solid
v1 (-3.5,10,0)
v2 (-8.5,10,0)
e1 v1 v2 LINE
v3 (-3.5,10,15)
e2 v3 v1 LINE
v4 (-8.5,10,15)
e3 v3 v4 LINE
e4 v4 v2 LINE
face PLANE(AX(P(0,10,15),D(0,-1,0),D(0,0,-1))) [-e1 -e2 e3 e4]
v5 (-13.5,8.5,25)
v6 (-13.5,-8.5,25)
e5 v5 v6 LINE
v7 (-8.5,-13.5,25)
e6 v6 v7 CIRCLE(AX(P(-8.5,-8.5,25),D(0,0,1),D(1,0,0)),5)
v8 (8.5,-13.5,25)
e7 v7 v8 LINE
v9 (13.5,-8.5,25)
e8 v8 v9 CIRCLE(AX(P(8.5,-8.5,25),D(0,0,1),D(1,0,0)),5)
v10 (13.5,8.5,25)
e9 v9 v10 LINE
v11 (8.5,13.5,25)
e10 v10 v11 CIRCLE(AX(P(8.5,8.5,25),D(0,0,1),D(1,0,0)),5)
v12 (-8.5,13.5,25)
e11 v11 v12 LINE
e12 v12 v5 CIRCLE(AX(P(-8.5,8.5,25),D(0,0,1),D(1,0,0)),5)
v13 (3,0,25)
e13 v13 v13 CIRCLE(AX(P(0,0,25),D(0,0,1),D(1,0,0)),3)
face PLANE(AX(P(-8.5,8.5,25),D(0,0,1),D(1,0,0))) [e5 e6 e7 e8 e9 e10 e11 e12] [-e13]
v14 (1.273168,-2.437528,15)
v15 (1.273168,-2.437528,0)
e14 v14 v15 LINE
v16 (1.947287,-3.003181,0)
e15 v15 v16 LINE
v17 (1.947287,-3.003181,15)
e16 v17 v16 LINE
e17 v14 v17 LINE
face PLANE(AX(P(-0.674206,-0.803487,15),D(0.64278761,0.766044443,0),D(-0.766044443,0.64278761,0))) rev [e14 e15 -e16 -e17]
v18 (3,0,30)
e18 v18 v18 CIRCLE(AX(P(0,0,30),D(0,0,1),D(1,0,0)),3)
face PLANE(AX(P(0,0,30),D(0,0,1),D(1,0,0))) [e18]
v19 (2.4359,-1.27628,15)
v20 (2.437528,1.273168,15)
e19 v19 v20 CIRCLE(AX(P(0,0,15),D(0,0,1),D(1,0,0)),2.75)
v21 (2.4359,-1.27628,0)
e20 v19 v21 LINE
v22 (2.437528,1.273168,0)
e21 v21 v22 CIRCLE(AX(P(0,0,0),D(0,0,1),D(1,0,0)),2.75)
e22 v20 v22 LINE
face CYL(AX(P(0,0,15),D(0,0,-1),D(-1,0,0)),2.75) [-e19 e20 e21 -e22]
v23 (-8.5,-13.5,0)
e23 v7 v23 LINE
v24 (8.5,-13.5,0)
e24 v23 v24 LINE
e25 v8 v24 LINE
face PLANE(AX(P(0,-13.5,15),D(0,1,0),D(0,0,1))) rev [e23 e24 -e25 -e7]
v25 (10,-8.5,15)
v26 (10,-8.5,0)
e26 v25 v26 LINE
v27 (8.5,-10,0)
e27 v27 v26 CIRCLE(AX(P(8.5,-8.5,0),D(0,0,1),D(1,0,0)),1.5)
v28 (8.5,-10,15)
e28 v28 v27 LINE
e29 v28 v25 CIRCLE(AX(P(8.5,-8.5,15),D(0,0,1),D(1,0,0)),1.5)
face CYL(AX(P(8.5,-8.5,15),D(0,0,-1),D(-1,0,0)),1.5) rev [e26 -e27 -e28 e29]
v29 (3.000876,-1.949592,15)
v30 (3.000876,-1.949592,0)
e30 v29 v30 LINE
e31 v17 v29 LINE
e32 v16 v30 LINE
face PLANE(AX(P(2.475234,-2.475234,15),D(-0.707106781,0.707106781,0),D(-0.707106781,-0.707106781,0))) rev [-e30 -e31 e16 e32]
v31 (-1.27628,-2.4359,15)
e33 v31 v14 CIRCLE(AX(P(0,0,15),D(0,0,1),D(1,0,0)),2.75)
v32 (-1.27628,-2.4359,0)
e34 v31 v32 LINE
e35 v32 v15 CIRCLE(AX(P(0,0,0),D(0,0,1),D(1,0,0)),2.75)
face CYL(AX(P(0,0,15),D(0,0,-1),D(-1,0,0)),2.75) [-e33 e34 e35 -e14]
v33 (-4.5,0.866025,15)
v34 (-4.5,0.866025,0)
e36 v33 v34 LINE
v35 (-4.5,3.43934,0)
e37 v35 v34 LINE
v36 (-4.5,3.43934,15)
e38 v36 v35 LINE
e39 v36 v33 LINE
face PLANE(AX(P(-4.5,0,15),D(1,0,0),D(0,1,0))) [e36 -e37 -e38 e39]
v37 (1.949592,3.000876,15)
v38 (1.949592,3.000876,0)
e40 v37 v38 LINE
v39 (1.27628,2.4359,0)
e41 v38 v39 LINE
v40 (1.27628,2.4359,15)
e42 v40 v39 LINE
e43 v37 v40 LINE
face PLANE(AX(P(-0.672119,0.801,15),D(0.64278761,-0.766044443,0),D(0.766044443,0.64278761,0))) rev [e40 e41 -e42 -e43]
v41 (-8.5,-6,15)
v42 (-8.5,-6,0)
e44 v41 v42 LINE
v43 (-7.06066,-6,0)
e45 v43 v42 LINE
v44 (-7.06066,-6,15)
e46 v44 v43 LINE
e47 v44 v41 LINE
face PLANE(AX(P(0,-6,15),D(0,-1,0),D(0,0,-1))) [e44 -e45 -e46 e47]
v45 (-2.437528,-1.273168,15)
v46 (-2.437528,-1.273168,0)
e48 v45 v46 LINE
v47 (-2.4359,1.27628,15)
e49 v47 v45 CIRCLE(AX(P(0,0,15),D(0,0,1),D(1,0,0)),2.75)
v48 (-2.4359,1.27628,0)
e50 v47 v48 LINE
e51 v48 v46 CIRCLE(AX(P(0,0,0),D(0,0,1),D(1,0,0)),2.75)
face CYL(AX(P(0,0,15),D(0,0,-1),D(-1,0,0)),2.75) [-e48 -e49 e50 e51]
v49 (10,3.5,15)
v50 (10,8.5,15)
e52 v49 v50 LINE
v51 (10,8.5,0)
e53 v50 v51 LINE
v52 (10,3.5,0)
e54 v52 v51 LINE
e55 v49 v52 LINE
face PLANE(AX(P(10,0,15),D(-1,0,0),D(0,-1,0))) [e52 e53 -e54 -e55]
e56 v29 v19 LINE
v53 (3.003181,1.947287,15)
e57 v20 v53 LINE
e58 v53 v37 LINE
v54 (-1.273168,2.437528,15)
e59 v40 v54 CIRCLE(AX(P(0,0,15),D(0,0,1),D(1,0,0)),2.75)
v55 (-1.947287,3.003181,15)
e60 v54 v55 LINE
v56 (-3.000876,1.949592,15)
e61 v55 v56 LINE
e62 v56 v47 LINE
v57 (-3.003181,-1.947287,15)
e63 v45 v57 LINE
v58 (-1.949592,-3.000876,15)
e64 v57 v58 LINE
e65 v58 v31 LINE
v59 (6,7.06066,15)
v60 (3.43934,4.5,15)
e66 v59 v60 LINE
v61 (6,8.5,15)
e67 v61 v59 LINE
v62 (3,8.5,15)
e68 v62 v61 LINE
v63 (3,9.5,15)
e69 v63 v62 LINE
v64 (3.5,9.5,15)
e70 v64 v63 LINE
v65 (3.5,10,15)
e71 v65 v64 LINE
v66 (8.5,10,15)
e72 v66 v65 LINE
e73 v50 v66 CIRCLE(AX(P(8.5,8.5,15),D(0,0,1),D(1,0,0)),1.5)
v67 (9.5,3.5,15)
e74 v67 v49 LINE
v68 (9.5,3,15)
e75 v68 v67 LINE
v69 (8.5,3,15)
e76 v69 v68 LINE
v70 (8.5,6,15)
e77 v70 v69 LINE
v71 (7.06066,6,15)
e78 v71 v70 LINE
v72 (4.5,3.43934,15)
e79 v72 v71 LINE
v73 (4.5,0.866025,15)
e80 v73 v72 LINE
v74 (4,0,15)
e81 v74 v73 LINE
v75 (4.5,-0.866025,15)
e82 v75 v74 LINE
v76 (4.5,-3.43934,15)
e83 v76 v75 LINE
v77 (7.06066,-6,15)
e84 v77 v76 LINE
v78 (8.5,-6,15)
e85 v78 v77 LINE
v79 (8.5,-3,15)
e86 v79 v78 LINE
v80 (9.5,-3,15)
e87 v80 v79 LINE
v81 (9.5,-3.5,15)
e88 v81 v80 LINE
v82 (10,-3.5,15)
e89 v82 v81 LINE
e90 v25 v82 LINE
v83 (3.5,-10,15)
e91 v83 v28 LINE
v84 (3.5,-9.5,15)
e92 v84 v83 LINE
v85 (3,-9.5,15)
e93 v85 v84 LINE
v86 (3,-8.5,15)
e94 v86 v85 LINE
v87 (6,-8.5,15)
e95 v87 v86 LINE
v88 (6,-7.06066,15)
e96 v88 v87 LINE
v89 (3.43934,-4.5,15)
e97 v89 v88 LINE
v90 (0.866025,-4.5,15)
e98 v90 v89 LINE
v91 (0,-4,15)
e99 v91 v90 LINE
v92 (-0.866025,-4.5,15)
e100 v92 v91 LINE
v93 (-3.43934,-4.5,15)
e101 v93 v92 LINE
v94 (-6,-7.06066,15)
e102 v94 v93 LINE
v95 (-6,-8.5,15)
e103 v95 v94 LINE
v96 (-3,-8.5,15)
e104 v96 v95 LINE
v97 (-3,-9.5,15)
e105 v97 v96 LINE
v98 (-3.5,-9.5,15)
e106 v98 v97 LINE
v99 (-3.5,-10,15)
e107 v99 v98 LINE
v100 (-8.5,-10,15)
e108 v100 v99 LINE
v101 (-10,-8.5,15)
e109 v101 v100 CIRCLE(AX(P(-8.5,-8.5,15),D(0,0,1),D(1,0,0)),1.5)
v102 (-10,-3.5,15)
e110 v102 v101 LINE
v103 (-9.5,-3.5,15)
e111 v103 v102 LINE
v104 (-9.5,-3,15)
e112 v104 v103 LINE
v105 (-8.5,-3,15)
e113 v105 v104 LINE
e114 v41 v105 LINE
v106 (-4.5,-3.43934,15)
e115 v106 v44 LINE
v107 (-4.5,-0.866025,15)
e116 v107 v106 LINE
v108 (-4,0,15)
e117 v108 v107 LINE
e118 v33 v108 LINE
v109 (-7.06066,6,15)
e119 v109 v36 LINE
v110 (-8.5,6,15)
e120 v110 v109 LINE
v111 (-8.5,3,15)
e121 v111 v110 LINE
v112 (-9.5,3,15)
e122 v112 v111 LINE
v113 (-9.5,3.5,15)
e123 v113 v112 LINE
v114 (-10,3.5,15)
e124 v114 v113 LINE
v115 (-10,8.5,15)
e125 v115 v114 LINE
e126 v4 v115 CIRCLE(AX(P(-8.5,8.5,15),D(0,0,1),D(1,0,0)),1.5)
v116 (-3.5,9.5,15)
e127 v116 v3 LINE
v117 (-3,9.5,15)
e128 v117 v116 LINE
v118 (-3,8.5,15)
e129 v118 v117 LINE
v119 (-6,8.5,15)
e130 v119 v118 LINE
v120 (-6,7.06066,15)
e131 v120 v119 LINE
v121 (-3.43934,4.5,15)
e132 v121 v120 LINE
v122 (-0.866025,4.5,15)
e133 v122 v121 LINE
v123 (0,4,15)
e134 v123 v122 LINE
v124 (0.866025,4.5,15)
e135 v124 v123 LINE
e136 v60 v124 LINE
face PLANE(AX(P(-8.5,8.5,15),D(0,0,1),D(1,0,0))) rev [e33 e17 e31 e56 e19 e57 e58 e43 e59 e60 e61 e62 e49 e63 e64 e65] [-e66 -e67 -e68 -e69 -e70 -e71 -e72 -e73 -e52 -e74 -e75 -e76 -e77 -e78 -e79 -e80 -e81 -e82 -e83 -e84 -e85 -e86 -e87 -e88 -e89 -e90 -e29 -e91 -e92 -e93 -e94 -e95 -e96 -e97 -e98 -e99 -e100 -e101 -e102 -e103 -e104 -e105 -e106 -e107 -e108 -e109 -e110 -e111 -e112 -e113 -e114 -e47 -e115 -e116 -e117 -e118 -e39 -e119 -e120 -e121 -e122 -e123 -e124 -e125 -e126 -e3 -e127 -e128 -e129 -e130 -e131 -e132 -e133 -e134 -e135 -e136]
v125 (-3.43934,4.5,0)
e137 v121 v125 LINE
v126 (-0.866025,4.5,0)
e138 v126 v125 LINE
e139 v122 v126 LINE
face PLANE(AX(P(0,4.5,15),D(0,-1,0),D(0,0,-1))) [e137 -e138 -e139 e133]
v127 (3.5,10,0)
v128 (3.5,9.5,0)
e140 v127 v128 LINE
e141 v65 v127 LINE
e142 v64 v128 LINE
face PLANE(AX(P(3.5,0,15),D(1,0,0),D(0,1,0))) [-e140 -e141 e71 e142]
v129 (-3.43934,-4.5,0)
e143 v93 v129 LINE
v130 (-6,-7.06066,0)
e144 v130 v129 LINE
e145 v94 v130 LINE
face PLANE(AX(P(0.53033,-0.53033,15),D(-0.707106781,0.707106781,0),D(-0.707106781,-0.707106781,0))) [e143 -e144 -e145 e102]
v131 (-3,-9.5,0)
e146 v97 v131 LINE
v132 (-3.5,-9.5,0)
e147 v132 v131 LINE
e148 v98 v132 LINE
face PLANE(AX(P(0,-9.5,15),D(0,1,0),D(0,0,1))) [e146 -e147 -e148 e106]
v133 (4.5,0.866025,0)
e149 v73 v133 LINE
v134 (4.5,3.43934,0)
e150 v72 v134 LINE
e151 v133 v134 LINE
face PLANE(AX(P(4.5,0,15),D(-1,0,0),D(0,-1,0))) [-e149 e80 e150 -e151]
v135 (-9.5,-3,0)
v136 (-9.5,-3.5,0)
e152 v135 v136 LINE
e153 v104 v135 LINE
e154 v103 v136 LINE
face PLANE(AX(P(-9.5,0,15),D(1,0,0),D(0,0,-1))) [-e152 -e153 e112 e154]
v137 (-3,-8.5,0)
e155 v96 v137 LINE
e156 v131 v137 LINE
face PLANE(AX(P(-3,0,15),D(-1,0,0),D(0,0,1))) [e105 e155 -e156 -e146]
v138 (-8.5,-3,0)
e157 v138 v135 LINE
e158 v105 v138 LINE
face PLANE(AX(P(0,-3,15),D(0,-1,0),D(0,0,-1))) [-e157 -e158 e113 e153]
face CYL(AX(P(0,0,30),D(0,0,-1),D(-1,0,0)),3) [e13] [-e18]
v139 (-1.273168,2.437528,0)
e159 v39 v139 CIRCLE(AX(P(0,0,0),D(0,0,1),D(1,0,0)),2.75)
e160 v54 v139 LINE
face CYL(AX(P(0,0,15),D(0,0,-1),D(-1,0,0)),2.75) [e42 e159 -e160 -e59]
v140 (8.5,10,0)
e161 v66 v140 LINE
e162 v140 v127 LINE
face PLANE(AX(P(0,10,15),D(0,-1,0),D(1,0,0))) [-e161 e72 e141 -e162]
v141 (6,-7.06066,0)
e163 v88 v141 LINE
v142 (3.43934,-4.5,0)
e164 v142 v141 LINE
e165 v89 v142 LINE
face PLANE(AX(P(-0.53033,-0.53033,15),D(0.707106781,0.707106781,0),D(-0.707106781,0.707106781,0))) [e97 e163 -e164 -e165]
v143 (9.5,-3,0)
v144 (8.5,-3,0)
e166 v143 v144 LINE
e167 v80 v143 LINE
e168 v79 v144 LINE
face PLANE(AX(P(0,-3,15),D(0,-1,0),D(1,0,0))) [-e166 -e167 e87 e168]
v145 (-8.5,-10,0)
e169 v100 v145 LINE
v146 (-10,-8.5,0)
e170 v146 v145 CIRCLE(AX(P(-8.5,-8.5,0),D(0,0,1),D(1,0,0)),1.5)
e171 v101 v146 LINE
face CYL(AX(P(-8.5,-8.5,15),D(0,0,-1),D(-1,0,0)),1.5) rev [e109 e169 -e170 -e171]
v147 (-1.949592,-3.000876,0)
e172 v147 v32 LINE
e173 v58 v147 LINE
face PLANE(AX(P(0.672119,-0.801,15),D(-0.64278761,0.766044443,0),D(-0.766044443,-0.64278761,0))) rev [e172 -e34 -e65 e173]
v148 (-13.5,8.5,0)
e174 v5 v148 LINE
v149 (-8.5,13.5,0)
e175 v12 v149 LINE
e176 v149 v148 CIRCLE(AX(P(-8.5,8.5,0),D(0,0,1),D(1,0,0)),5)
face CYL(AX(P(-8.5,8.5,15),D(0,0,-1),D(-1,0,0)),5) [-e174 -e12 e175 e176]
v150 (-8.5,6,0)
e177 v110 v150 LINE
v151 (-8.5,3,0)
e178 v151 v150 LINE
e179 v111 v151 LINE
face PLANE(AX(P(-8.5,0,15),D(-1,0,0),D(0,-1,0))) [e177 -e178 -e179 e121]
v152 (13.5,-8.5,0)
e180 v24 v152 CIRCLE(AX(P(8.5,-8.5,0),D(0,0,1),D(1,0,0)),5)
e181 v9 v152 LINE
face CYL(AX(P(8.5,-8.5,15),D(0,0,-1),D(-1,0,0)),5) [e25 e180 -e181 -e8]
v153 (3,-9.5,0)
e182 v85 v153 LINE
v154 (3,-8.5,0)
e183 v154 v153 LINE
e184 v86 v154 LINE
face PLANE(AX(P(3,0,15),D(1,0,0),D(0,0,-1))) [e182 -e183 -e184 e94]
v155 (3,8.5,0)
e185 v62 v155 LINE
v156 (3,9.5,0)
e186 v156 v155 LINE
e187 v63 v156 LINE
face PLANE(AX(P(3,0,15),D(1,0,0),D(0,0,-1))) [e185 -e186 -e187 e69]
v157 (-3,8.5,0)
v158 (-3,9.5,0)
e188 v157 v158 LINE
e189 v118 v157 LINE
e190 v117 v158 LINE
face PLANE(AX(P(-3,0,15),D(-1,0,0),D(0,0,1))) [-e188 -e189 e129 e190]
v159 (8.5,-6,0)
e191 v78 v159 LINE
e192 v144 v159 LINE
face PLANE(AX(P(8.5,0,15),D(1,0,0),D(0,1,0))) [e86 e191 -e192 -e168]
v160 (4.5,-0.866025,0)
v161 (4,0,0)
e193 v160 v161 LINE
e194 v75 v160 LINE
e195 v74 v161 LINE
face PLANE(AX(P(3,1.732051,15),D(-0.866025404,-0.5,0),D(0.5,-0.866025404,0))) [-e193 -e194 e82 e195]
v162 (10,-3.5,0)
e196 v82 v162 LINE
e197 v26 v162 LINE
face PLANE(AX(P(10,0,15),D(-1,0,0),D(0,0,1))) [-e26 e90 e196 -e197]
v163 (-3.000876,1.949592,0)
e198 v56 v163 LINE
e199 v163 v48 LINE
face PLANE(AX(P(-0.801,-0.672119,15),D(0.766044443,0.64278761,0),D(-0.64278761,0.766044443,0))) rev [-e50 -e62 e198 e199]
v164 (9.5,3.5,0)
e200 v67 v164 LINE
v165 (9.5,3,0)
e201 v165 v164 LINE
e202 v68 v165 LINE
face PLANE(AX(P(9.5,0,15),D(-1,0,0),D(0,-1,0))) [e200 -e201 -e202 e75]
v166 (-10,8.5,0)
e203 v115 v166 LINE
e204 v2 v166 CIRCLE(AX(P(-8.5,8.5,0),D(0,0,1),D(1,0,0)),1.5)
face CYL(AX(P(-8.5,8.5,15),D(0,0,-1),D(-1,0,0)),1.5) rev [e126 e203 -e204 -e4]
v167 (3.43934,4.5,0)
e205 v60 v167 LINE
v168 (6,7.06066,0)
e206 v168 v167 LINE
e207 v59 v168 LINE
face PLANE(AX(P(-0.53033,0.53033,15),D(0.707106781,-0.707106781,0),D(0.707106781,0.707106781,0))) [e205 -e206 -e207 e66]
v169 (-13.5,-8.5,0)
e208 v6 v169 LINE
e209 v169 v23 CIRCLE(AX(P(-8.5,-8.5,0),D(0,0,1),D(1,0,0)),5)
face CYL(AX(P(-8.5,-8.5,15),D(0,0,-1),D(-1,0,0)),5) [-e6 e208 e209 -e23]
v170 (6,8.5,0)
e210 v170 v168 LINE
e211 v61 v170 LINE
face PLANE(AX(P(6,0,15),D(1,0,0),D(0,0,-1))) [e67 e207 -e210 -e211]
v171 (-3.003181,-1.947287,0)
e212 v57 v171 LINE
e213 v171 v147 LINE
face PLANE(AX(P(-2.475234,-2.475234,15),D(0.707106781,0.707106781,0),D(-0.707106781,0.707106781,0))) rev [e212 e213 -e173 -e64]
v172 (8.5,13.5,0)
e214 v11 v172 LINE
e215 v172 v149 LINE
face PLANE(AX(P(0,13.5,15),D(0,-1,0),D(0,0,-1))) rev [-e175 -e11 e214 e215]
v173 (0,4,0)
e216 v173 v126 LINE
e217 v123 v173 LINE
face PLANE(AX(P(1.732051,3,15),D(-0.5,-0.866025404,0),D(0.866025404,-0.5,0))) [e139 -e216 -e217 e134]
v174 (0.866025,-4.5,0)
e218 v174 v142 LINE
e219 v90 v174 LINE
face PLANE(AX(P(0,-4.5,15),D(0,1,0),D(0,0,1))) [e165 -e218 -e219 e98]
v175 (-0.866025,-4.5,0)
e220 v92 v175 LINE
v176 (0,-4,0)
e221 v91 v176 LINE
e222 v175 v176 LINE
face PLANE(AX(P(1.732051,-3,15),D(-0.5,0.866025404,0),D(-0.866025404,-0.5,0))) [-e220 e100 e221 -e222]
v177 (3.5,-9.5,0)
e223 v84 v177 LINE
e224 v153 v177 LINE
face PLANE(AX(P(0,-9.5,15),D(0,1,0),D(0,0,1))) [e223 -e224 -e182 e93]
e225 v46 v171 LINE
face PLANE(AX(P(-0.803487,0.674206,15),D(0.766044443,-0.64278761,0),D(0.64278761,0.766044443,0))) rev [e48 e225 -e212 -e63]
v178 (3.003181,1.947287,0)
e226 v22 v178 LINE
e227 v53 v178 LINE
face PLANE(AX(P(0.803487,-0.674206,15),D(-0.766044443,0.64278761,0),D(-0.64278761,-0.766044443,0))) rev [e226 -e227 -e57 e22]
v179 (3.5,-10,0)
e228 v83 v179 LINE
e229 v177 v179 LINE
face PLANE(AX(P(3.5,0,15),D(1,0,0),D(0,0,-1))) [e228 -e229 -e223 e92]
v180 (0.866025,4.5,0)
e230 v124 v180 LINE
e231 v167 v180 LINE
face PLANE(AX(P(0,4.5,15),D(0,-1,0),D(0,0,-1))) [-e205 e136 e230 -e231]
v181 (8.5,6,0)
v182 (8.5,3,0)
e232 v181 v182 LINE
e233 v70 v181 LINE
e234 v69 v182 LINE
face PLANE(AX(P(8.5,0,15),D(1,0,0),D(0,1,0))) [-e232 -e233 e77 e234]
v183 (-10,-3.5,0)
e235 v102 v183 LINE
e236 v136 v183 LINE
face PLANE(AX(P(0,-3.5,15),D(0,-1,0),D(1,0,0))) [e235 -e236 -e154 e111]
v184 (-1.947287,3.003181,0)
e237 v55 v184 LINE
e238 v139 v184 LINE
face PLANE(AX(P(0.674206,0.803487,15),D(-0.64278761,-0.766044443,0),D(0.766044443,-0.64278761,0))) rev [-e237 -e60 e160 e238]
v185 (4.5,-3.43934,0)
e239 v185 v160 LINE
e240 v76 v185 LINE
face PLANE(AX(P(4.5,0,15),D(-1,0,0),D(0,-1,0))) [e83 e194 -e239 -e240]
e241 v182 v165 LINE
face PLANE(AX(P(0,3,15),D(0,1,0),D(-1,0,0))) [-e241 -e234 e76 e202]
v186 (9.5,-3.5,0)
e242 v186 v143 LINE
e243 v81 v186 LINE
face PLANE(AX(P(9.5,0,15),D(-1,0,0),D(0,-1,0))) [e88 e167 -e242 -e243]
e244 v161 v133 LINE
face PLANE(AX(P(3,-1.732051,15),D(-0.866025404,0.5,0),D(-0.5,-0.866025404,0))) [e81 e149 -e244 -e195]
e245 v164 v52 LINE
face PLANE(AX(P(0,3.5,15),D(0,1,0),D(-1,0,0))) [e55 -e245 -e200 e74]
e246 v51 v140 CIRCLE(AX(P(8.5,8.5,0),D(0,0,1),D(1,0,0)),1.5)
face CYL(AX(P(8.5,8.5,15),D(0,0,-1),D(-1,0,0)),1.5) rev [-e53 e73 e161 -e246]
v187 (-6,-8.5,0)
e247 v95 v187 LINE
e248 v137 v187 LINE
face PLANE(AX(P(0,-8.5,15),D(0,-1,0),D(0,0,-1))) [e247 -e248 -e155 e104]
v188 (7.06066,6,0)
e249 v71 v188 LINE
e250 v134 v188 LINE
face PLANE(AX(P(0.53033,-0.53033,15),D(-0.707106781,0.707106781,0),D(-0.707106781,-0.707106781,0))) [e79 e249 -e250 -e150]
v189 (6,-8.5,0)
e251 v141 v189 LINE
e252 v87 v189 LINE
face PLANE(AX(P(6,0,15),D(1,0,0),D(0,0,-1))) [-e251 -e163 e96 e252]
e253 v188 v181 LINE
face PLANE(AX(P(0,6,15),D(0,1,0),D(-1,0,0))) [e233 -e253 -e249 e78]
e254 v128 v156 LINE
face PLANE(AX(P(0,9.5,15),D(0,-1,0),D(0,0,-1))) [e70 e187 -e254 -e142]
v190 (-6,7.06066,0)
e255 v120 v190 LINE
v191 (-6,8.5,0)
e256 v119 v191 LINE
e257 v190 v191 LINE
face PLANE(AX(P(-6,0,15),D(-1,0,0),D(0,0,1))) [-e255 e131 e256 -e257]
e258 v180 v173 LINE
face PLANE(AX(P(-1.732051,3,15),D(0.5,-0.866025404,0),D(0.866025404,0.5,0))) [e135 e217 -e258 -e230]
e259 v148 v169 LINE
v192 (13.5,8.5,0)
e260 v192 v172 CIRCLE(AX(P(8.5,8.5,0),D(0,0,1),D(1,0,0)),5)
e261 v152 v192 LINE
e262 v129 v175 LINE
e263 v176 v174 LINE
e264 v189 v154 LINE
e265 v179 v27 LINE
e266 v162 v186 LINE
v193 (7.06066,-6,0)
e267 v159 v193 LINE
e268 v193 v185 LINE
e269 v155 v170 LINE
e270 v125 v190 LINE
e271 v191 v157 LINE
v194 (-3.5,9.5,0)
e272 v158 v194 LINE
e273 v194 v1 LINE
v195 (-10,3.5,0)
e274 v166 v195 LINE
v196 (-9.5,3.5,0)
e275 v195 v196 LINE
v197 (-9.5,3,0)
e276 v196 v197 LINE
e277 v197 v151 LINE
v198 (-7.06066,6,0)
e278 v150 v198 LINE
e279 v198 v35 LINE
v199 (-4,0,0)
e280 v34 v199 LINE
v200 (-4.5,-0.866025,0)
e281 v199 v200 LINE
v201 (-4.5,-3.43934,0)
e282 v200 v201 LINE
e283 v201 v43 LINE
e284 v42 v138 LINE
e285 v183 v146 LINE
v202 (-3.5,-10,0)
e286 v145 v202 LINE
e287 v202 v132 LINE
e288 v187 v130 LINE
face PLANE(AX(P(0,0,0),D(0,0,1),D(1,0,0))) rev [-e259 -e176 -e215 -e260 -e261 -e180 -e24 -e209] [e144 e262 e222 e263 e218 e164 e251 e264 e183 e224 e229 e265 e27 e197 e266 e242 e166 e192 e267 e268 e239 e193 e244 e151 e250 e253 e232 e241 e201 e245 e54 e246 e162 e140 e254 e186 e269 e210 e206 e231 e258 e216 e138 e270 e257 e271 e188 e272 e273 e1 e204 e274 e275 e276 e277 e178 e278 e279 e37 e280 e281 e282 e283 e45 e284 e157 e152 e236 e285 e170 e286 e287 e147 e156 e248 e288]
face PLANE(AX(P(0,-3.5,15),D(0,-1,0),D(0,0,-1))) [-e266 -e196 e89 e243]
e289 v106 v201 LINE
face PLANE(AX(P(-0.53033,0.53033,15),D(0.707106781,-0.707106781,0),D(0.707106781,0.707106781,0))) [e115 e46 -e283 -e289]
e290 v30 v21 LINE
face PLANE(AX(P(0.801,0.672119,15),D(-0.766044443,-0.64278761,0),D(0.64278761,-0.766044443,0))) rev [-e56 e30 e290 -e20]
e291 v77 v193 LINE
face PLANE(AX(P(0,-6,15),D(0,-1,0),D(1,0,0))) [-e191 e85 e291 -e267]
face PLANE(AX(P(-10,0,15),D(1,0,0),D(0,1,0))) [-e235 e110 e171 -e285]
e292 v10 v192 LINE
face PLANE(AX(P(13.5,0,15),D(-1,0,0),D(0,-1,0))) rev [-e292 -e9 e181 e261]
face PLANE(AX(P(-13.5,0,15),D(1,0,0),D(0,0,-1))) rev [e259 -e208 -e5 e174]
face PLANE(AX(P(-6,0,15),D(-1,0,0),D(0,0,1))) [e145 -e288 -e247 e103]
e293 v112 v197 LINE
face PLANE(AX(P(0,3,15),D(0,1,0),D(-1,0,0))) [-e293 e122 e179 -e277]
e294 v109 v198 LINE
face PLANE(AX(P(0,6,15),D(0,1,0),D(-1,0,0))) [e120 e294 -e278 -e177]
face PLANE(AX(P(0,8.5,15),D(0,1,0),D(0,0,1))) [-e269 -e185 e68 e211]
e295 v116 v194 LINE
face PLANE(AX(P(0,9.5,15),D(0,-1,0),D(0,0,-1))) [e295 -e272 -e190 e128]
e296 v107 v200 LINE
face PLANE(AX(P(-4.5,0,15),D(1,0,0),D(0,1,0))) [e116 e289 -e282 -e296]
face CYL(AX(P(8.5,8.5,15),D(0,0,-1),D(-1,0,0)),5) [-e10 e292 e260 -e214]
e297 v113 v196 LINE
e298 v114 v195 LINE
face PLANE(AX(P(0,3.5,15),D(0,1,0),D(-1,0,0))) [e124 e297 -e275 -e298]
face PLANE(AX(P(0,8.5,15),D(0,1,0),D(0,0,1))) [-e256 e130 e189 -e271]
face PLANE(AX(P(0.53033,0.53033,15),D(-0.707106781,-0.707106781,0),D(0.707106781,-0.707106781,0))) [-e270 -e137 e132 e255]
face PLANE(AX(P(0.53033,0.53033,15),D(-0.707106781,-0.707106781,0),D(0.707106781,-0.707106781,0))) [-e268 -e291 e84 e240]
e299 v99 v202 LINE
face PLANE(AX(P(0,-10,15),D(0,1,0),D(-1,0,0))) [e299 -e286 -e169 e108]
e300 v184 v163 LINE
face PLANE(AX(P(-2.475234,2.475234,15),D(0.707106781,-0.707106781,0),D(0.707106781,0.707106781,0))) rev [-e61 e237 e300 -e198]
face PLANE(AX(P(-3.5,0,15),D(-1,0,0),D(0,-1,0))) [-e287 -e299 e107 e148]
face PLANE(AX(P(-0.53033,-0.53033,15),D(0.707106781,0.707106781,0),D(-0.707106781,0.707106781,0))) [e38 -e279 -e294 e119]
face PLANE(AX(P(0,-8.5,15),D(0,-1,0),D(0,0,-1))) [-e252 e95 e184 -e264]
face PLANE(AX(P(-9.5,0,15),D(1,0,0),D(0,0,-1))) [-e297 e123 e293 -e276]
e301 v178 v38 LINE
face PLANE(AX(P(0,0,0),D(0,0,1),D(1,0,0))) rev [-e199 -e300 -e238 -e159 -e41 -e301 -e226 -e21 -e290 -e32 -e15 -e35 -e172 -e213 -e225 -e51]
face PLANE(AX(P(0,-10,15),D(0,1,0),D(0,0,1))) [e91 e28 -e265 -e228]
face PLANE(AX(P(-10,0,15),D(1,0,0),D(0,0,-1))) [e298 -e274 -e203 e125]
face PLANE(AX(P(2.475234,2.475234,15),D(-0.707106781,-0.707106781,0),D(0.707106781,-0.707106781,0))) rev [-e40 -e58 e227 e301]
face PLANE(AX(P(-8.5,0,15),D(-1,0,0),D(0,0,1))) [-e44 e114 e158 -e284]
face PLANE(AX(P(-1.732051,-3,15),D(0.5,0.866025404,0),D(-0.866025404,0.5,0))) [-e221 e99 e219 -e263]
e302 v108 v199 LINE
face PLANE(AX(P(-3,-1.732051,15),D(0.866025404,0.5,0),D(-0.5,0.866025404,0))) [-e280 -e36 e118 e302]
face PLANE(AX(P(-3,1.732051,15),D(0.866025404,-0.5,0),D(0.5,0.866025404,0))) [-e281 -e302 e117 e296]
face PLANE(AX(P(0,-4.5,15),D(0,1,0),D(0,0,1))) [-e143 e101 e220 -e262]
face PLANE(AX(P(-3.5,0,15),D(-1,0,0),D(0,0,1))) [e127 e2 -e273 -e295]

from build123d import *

# Parameters (mm, degrees)
BOSS_EXTRU_5_DEPTH = 15
BOSS_EXTRU_6_DEPTH = 10
ESQUISSE7_R        = 3
BOSS_EXTRU_7_DEPTH = 5


# Read off the part's stored shape, not the designer's step: Boss.-Extru.5
with BuildPart() as part:
    # Boss.-Extru.5 outline → Boss.-Extru.5 (new body)
    # profile 1 of 2: a face of its own
    with BuildSketch(Plane.XY):
        with BuildLine():
            Line((-8.5, -13.5), (8.5, -13.5))
            ThreePointArc((8.5, -13.5), (12.035533906, -12.035533906), (13.5, -8.5))
            Line((13.5, -8.5), (13.5, 8.5))
            ThreePointArc((13.5, 8.5), (12.035533906, 12.035533906), (8.5, 13.5))
            Line((8.5, 13.5), (-8.5, 13.5))
            ThreePointArc((-8.5, 13.5), (-12.035533906, 12.035533906), (-13.5, 8.5))
            Line((-13.5, 8.5), (-13.5, -8.5))
            ThreePointArc((-13.5, -8.5), (-12.035533906, -12.035533906), (-8.5, -13.5))
        make_face()
        with BuildLine():
            Line((-10, 3.5), (-10, 8.5))
            ThreePointArc((-10, 8.5), (-9.560660172, 9.560660172), (-8.5, 10))
            Line((-8.5, 10), (-3.5, 10))
            Line((-3.5, 10), (-3.5, 9.5))
            Line((-3.5, 9.5), (-3, 9.5))
            Line((-3, 9.5), (-3, 8.5))
            Line((-3, 8.5), (-6, 8.5))
            Line((-6, 8.5), (-6, 7.060660172))
            Line((-6, 7.060660172), (-3.439339828, 4.5))
            Line((-3.439339828, 4.5), (-0.866025404, 4.5))
            Line((-0.866025404, 4.5), (0, 4))
            Line((0, 4), (0.866025404, 4.5))
            Line((0.866025404, 4.5), (3.439339828, 4.5))
            Line((3.439339828, 4.5), (6, 7.060660172))
            Line((6, 7.060660172), (6, 8.5))
            Line((6, 8.5), (3, 8.5))
            Line((3, 8.5), (3, 9.5))
            Line((3, 9.5), (3.5, 9.5))
            Line((3.5, 9.5), (3.5, 10))
            Line((3.5, 10), (8.5, 10))
            ThreePointArc((8.5, 10), (9.560660172, 9.560660172), (10, 8.5))
            Line((10, 8.5), (10, 3.5))
            Line((10, 3.5), (9.5, 3.5))
            Line((9.5, 3.5), (9.5, 3))
            Line((9.5, 3), (8.5, 3))
            Line((8.5, 3), (8.5, 6))
            Line((8.5, 6), (7.060660172, 6))
            Line((7.060660172, 6), (4.5, 3.439339828))
            Line((4.5, 3.439339828), (4.5, 0.866025404))
            Line((4.5, 0.866025404), (4, 0))
            Line((4, 0), (4.5, -0.866025404))
            Line((4.5, -0.866025404), (4.5, -3.439339828))
            Line((4.5, -3.439339828), (7.060660172, -6))
            Line((7.060660172, -6), (8.5, -6))
            Line((8.5, -6), (8.5, -3))
            Line((8.5, -3), (9.5, -3))
            Line((9.5, -3), (9.5, -3.5))
            Line((9.5, -3.5), (10, -3.5))
            Line((10, -3.5), (10, -8.5))
            ThreePointArc((10, -8.5), (9.560660172, -9.560660172), (8.5, -10))
            Line((8.5, -10), (3.5, -10))
            Line((3.5, -10), (3.5, -9.5))
            Line((3.5, -9.5), (3, -9.5))
            Line((3, -9.5), (3, -8.5))
            Line((3, -8.5), (6, -8.5))
            Line((6, -8.5), (6, -7.060660172))
            Line((6, -7.060660172), (3.439339828, -4.5))
            Line((3.439339828, -4.5), (0.866025404, -4.5))
            Line((0.866025404, -4.5), (0, -4))
            Line((0, -4), (-0.866025404, -4.5))
            Line((-0.866025404, -4.5), (-3.439339828, -4.5))
            Line((-3.439339828, -4.5), (-6, -7.060660172))
            Line((-6, -7.060660172), (-6, -8.5))
            Line((-6, -8.5), (-3, -8.5))
            Line((-3, -8.5), (-3, -9.5))
            Line((-3, -9.5), (-3.5, -9.5))
            Line((-3.5, -9.5), (-3.5, -10))
            Line((-3.5, -10), (-8.5, -10))
            ThreePointArc((-8.5, -10), (-9.560660172, -9.560660172), (-10, -8.5))
            Line((-10, -8.5), (-10, -3.5))
            Line((-10, -3.5), (-9.5, -3.5))
            Line((-9.5, -3.5), (-9.5, -3))
            Line((-9.5, -3), (-8.5, -3))
            Line((-8.5, -3), (-8.5, -6))
            Line((-8.5, -6), (-7.060660172, -6))
            Line((-7.060660172, -6), (-4.5, -3.439339828))
            Line((-4.5, -3.439339828), (-4.5, -0.866025404))
            Line((-4.5, -0.866025404), (-4, 0))
            Line((-4, 0), (-4.5, 0.866025404))
            Line((-4.5, 0.866025404), (-4.5, 3.439339828))
            Line((-4.5, 3.439339828), (-7.060660172, 6))
            Line((-7.060660172, 6), (-8.5, 6))
            Line((-8.5, 6), (-8.5, 3))
            Line((-8.5, 3), (-9.5, 3))
            Line((-9.5, 3), (-9.5, 3.5))
            Line((-9.5, 3.5), (-10, 3.5))
        make_face(mode=Mode.SUBTRACT)
    # profile 2 of 2: a face of its own
    with BuildSketch(Plane.XY):
        with BuildLine():
            Line((1.949592103, 3.000876196), (1.276279893, 2.435900169))
            ThreePointArc((1.276279893, 2.435900169), (0.001756003, 2.749999439), (-1.273167982, 2.43752811))
            Line((-1.273167982, 2.43752811), (-1.947287092, 3.003181207))
            Line((-1.947287092, 3.003181207), (-3.000876196, 1.949592103))
            Line((-3.000876196, 1.949592103), (-2.435900169, 1.276279893))
            ThreePointArc((-2.435900169, 1.276279893), (-2.749999439, 0.001756003), (-2.43752811, -1.273167982))
            Line((-2.43752811, -1.273167982), (-3.003181207, -1.947287092))
            Line((-3.003181207, -1.947287092), (-1.949592103, -3.000876196))
            Line((-1.949592103, -3.000876196), (-1.276279893, -2.435900169))
            ThreePointArc((-1.276279893, -2.435900169), (-0.001756003, -2.749999439), (1.273167982, -2.43752811))
            Line((1.273167982, -2.43752811), (1.947287092, -3.003181207))
            Line((1.947287092, -3.003181207), (3.000876196, -1.949592103))
            Line((3.000876196, -1.949592103), (2.435900169, -1.276279893))
            ThreePointArc((2.435900169, -1.276279893), (2.749999439, -0.001756003), (2.43752811, 1.273167982))
            Line((2.43752811, 1.273167982), (3.003181207, 1.947287092))
            Line((3.003181207, 1.947287092), (1.949592103, 3.000876196))
        make_face()
    extrude(amount=BOSS_EXTRU_5_DEPTH)

    # Esquisse6 → Boss.-Extru.6 (add)
    with BuildSketch(Plane.XY.offset(15)):
        with BuildLine():
            Line((-13.5, 8.5), (-13.5, -8.5))
            ThreePointArc((-13.5, -8.5), (-12.035533906, -12.035533906), (-8.5, -13.5))
            Line((-8.5, -13.5), (8.5, -13.5))
            ThreePointArc((8.5, -13.5), (12.035533906, -12.035533906), (13.5, -8.5))
            Line((13.5, -8.5), (13.5, 8.5))
            ThreePointArc((13.5, 8.5), (12.035533906, 12.035533906), (8.5, 13.5))
            Line((8.5, 13.5), (-8.5, 13.5))
            ThreePointArc((-8.5, 13.5), (-12.035533906, 12.035533906), (-13.5, 8.5))
        make_face()
    extrude(amount=BOSS_EXTRU_6_DEPTH)

    # Esquisse7 → Boss.-Extru.7 (add)
    with BuildSketch(Plane.XY.offset(25)):
        Circle(ESQUISSE7_R)
    extrude(amount=BOSS_EXTRU_7_DEPTH)


solid = part.part
